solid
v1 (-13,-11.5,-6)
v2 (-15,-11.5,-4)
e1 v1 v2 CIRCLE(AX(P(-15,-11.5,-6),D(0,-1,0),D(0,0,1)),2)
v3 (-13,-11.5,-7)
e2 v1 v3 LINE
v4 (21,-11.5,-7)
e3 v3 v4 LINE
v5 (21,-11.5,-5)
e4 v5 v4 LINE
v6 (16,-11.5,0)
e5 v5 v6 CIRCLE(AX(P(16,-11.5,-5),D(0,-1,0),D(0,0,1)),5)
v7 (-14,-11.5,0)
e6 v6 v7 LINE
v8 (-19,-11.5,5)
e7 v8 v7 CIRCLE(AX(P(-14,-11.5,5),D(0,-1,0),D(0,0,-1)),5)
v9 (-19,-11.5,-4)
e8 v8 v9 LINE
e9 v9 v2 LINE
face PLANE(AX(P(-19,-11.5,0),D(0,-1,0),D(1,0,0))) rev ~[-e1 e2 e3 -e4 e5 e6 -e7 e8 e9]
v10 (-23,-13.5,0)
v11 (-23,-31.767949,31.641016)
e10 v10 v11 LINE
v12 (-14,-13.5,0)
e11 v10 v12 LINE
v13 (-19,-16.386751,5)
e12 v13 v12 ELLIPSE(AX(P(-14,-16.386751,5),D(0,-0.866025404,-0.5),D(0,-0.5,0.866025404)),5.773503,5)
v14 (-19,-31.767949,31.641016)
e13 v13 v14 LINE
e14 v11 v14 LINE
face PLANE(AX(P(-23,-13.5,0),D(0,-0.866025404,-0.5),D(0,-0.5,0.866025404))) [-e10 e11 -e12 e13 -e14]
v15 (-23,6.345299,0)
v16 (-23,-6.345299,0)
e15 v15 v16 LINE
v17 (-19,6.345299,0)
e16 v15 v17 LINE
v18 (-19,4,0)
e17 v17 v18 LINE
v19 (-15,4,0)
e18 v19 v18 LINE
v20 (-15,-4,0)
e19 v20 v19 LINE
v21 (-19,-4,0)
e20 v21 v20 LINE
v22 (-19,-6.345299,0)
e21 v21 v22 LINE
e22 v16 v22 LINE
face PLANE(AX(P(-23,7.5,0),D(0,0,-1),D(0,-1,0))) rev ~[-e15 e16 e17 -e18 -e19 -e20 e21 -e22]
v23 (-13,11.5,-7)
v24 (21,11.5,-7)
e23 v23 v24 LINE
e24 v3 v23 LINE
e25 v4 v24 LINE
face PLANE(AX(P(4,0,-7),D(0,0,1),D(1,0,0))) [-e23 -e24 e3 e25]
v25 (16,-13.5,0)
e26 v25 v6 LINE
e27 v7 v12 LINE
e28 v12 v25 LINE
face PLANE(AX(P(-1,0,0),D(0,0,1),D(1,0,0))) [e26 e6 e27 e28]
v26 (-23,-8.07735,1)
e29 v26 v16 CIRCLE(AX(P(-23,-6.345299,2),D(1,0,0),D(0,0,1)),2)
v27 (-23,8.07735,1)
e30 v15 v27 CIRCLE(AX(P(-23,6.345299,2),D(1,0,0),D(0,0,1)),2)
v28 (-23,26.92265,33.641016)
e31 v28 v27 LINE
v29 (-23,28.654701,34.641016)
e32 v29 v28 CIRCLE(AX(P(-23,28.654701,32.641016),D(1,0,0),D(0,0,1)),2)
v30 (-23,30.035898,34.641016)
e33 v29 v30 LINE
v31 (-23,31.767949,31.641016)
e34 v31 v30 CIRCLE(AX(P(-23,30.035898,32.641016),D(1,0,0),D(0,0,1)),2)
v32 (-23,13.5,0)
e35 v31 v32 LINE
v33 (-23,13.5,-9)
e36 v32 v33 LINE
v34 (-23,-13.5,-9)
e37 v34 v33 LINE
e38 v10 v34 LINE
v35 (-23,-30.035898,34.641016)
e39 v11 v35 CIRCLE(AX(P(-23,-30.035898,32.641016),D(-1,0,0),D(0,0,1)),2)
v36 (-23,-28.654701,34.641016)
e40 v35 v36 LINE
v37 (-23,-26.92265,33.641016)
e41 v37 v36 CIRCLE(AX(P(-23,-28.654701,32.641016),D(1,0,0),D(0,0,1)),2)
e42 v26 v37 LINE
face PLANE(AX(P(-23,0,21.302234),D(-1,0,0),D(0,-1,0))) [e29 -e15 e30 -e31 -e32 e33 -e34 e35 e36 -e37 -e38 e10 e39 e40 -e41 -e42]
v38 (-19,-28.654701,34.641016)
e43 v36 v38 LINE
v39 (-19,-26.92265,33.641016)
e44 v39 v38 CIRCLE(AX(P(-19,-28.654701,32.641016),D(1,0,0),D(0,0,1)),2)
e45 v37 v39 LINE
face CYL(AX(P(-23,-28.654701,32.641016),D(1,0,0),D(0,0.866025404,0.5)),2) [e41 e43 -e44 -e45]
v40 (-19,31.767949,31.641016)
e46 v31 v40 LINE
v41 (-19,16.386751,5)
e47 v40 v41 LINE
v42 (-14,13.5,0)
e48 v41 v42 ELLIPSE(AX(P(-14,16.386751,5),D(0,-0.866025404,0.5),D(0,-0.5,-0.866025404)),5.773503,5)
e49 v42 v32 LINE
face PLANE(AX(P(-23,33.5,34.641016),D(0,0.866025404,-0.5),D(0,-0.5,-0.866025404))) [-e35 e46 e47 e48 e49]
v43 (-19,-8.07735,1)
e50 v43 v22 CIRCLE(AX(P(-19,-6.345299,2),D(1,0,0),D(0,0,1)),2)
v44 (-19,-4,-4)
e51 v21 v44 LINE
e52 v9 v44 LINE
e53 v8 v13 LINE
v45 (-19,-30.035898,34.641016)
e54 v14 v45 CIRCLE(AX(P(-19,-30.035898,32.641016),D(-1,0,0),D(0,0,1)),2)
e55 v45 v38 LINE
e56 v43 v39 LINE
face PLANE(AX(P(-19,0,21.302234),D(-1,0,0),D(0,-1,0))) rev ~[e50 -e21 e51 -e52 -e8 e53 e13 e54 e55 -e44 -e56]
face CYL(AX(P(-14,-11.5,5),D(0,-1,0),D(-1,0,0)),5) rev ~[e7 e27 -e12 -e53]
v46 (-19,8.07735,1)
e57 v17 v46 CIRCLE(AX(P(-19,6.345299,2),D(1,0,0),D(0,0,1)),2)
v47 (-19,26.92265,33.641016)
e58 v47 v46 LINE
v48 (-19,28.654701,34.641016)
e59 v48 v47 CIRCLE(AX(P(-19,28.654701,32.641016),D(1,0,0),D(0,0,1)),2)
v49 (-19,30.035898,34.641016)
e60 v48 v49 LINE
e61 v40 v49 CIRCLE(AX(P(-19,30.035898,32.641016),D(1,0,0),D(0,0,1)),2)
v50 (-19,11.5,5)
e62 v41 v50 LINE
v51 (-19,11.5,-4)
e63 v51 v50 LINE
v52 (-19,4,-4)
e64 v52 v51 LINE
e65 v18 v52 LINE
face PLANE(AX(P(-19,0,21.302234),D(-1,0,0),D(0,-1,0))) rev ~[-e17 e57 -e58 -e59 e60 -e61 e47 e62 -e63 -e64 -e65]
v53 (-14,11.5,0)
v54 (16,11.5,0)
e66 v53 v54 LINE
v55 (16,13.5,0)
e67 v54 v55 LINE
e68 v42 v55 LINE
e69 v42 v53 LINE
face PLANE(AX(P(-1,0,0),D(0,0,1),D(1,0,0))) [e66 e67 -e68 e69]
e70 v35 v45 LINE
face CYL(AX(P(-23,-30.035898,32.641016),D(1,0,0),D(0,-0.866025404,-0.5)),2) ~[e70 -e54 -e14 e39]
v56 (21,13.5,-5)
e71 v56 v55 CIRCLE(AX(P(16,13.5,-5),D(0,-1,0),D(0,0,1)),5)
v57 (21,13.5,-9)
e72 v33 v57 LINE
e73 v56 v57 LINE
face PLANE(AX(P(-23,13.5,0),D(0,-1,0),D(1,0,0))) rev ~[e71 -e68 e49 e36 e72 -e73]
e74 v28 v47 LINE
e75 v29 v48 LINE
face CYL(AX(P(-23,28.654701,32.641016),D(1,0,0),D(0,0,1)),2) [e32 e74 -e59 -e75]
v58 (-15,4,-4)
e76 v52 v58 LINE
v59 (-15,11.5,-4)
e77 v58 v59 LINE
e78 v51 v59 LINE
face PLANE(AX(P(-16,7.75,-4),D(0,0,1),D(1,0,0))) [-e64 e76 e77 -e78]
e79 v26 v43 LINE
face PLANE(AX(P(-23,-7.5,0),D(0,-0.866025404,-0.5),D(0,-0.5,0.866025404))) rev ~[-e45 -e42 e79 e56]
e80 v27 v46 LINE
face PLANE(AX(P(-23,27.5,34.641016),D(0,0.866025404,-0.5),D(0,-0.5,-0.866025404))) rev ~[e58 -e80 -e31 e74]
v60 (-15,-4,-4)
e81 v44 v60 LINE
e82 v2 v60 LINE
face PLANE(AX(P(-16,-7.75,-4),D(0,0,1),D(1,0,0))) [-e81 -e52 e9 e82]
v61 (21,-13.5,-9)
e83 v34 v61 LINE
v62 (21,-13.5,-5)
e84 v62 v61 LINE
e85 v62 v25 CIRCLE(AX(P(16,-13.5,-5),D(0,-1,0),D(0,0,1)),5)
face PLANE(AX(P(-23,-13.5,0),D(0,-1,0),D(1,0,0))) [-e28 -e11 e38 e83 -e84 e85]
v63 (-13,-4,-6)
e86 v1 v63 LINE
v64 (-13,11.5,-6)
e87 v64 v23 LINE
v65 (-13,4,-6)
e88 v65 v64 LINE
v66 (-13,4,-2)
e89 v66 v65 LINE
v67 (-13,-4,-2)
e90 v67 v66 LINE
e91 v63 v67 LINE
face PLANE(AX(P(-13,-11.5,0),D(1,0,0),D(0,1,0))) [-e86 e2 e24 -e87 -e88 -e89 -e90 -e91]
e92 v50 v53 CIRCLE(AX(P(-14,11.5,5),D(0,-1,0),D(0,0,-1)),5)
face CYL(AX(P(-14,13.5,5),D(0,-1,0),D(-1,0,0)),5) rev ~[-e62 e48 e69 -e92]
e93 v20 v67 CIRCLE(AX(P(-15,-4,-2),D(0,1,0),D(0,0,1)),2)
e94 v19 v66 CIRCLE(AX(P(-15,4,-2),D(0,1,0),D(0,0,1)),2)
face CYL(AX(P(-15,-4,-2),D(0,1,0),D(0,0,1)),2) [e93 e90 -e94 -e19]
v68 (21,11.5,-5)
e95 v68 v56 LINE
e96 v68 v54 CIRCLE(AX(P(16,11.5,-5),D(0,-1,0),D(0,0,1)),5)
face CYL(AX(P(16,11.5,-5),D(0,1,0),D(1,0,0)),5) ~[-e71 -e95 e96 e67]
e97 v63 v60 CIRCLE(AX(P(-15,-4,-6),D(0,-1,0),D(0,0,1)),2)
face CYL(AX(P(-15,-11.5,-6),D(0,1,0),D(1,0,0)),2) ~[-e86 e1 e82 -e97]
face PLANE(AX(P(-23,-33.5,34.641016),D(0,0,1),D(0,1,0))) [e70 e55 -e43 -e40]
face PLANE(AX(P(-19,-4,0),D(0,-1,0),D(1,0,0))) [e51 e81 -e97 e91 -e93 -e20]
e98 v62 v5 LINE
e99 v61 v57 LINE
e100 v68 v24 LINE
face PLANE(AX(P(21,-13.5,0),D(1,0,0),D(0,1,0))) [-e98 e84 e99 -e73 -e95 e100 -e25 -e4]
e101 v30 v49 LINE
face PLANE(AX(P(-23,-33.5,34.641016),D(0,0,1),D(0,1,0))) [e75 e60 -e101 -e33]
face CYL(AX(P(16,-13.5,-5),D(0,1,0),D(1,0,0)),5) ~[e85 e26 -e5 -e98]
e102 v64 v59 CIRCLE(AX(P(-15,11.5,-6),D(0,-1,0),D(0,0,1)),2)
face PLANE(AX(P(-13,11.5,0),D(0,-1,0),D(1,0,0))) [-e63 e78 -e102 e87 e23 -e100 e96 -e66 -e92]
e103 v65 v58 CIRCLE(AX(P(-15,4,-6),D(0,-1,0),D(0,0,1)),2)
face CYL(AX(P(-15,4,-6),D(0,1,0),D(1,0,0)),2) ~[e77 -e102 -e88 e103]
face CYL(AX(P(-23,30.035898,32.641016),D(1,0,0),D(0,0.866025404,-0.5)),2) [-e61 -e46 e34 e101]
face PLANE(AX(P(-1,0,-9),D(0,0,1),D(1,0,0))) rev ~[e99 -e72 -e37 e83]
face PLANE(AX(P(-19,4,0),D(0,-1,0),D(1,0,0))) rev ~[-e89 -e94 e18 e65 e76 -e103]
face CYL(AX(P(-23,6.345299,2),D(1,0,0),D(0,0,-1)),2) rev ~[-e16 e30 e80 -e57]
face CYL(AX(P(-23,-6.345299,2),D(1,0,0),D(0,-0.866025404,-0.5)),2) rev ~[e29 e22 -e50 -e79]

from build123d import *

# Parameters (mm, degrees)
F0_W      = 44
F0_H      = 27
F1_DEPTH  = 9
F2_W      = 34
F2_H      = 23
F3_DEPTH  = 7
F6_W      = 6
F6_H      = 7.5
F7_DEPTH  = 4
F5_W      = 6
F5_H      = 7.5
F10_DEPTH = 4
F12_DEPTH = 5
F14_R     = 2
F15_R     = 5


with BuildPart() as f1:
    # F0 (on Top) → F1 (new body)
    with BuildSketch(Plane.XY):
        with Locations((-1, 0)):
            Rectangle(F0_W, F0_H)
    extrude(amount=-F1_DEPTH)


with BuildPart() as f3:
    # F2 (on Top) → F3 (new body)
    with BuildSketch(Plane.XY):
        with Locations((4, 0)):
            Rectangle(F2_W, F2_H)
    extrude(amount=-F3_DEPTH)


with BuildPart() as f1_1:
    add(f1.part)

    # F4: cut F3
    add(f3.part, mode=Mode.SUBTRACT)


with BuildPart() as f7:
    # F6 (on Top) → F7 (new body)
    with BuildSketch(Plane.XY):
        with Locations((-16, -7.75)):
            Rectangle(F6_W, F6_H)
    extrude(amount=-F7_DEPTH)


with BuildPart() as f7b:
    # F5 (on Top) → F7, piece 2 (new body)
    with BuildSketch(Plane.XY):
        with Locations((-16, 7.75)):
            Rectangle(F5_W, F5_H)
    extrude(amount=-F7_DEPTH)


with BuildPart() as f1_2:
    add(f1_1.part)

    # F8: cut F7b, F7
    add(f7b.part, mode=Mode.SUBTRACT)
    add(f7.part, mode=Mode.SUBTRACT)

    # F9 (on face) → F10 (join)
    with BuildSketch(Plane(origin=(-23, 0, 0), x_dir=(0, -1, 0), z_dir=(-1, 0, 0))):
        Polygon((-13.5, 0), (13.5, 0), (33.5, 34.6410161514), (-33.5, 34.6410161514), align=None)
    extrude(amount=-F10_DEPTH)


with BuildPart() as f12:
    # F11 (on face) → F12 (new body)
    with BuildSketch(Plane(origin=(-23, 0, 0), x_dir=(0, -1, 0), z_dir=(-1, 0, 0))):
        Polygon((-7.5, 0), (7.5, 0), (27.5, 34.6410161514), (-27.5, 34.6410161514), align=None)
    extrude(amount=-F12_DEPTH)


with BuildPart() as f1_3:
    add(f1_2.part)

    # F13: cut F12
    add(f12.part, mode=Mode.SUBTRACT)

    # F14
    f14_edges = [f1_3.edges().sort_by_distance(p)[0] for p in [
        (-21, 33.5, 34.641016),
        (-21, 27.5, 34.641016),
        (-21, -27.5, 34.641016),
        (-21, -33.5, 34.641016),
        (-21, -7.5, 0),
        (-21, 7.5, 0),
        (-13, 0, 0),
        (-13, 7.75, -4),
        (-13, -7.75, -4),
    ]]
    fillet(f14_edges, radius=F14_R)

    # F15
    f15_edges = [f1_3.edges().sort_by_distance(p)[0] for p in [
        (-19, -12.5, 0),
        (-19, 12.5, 0),
        (21, 12.5, 0),
        (21, -12.5, 0),
    ]]
    fillet(f15_edges, radius=F15_R)


solid = f1_3.part
